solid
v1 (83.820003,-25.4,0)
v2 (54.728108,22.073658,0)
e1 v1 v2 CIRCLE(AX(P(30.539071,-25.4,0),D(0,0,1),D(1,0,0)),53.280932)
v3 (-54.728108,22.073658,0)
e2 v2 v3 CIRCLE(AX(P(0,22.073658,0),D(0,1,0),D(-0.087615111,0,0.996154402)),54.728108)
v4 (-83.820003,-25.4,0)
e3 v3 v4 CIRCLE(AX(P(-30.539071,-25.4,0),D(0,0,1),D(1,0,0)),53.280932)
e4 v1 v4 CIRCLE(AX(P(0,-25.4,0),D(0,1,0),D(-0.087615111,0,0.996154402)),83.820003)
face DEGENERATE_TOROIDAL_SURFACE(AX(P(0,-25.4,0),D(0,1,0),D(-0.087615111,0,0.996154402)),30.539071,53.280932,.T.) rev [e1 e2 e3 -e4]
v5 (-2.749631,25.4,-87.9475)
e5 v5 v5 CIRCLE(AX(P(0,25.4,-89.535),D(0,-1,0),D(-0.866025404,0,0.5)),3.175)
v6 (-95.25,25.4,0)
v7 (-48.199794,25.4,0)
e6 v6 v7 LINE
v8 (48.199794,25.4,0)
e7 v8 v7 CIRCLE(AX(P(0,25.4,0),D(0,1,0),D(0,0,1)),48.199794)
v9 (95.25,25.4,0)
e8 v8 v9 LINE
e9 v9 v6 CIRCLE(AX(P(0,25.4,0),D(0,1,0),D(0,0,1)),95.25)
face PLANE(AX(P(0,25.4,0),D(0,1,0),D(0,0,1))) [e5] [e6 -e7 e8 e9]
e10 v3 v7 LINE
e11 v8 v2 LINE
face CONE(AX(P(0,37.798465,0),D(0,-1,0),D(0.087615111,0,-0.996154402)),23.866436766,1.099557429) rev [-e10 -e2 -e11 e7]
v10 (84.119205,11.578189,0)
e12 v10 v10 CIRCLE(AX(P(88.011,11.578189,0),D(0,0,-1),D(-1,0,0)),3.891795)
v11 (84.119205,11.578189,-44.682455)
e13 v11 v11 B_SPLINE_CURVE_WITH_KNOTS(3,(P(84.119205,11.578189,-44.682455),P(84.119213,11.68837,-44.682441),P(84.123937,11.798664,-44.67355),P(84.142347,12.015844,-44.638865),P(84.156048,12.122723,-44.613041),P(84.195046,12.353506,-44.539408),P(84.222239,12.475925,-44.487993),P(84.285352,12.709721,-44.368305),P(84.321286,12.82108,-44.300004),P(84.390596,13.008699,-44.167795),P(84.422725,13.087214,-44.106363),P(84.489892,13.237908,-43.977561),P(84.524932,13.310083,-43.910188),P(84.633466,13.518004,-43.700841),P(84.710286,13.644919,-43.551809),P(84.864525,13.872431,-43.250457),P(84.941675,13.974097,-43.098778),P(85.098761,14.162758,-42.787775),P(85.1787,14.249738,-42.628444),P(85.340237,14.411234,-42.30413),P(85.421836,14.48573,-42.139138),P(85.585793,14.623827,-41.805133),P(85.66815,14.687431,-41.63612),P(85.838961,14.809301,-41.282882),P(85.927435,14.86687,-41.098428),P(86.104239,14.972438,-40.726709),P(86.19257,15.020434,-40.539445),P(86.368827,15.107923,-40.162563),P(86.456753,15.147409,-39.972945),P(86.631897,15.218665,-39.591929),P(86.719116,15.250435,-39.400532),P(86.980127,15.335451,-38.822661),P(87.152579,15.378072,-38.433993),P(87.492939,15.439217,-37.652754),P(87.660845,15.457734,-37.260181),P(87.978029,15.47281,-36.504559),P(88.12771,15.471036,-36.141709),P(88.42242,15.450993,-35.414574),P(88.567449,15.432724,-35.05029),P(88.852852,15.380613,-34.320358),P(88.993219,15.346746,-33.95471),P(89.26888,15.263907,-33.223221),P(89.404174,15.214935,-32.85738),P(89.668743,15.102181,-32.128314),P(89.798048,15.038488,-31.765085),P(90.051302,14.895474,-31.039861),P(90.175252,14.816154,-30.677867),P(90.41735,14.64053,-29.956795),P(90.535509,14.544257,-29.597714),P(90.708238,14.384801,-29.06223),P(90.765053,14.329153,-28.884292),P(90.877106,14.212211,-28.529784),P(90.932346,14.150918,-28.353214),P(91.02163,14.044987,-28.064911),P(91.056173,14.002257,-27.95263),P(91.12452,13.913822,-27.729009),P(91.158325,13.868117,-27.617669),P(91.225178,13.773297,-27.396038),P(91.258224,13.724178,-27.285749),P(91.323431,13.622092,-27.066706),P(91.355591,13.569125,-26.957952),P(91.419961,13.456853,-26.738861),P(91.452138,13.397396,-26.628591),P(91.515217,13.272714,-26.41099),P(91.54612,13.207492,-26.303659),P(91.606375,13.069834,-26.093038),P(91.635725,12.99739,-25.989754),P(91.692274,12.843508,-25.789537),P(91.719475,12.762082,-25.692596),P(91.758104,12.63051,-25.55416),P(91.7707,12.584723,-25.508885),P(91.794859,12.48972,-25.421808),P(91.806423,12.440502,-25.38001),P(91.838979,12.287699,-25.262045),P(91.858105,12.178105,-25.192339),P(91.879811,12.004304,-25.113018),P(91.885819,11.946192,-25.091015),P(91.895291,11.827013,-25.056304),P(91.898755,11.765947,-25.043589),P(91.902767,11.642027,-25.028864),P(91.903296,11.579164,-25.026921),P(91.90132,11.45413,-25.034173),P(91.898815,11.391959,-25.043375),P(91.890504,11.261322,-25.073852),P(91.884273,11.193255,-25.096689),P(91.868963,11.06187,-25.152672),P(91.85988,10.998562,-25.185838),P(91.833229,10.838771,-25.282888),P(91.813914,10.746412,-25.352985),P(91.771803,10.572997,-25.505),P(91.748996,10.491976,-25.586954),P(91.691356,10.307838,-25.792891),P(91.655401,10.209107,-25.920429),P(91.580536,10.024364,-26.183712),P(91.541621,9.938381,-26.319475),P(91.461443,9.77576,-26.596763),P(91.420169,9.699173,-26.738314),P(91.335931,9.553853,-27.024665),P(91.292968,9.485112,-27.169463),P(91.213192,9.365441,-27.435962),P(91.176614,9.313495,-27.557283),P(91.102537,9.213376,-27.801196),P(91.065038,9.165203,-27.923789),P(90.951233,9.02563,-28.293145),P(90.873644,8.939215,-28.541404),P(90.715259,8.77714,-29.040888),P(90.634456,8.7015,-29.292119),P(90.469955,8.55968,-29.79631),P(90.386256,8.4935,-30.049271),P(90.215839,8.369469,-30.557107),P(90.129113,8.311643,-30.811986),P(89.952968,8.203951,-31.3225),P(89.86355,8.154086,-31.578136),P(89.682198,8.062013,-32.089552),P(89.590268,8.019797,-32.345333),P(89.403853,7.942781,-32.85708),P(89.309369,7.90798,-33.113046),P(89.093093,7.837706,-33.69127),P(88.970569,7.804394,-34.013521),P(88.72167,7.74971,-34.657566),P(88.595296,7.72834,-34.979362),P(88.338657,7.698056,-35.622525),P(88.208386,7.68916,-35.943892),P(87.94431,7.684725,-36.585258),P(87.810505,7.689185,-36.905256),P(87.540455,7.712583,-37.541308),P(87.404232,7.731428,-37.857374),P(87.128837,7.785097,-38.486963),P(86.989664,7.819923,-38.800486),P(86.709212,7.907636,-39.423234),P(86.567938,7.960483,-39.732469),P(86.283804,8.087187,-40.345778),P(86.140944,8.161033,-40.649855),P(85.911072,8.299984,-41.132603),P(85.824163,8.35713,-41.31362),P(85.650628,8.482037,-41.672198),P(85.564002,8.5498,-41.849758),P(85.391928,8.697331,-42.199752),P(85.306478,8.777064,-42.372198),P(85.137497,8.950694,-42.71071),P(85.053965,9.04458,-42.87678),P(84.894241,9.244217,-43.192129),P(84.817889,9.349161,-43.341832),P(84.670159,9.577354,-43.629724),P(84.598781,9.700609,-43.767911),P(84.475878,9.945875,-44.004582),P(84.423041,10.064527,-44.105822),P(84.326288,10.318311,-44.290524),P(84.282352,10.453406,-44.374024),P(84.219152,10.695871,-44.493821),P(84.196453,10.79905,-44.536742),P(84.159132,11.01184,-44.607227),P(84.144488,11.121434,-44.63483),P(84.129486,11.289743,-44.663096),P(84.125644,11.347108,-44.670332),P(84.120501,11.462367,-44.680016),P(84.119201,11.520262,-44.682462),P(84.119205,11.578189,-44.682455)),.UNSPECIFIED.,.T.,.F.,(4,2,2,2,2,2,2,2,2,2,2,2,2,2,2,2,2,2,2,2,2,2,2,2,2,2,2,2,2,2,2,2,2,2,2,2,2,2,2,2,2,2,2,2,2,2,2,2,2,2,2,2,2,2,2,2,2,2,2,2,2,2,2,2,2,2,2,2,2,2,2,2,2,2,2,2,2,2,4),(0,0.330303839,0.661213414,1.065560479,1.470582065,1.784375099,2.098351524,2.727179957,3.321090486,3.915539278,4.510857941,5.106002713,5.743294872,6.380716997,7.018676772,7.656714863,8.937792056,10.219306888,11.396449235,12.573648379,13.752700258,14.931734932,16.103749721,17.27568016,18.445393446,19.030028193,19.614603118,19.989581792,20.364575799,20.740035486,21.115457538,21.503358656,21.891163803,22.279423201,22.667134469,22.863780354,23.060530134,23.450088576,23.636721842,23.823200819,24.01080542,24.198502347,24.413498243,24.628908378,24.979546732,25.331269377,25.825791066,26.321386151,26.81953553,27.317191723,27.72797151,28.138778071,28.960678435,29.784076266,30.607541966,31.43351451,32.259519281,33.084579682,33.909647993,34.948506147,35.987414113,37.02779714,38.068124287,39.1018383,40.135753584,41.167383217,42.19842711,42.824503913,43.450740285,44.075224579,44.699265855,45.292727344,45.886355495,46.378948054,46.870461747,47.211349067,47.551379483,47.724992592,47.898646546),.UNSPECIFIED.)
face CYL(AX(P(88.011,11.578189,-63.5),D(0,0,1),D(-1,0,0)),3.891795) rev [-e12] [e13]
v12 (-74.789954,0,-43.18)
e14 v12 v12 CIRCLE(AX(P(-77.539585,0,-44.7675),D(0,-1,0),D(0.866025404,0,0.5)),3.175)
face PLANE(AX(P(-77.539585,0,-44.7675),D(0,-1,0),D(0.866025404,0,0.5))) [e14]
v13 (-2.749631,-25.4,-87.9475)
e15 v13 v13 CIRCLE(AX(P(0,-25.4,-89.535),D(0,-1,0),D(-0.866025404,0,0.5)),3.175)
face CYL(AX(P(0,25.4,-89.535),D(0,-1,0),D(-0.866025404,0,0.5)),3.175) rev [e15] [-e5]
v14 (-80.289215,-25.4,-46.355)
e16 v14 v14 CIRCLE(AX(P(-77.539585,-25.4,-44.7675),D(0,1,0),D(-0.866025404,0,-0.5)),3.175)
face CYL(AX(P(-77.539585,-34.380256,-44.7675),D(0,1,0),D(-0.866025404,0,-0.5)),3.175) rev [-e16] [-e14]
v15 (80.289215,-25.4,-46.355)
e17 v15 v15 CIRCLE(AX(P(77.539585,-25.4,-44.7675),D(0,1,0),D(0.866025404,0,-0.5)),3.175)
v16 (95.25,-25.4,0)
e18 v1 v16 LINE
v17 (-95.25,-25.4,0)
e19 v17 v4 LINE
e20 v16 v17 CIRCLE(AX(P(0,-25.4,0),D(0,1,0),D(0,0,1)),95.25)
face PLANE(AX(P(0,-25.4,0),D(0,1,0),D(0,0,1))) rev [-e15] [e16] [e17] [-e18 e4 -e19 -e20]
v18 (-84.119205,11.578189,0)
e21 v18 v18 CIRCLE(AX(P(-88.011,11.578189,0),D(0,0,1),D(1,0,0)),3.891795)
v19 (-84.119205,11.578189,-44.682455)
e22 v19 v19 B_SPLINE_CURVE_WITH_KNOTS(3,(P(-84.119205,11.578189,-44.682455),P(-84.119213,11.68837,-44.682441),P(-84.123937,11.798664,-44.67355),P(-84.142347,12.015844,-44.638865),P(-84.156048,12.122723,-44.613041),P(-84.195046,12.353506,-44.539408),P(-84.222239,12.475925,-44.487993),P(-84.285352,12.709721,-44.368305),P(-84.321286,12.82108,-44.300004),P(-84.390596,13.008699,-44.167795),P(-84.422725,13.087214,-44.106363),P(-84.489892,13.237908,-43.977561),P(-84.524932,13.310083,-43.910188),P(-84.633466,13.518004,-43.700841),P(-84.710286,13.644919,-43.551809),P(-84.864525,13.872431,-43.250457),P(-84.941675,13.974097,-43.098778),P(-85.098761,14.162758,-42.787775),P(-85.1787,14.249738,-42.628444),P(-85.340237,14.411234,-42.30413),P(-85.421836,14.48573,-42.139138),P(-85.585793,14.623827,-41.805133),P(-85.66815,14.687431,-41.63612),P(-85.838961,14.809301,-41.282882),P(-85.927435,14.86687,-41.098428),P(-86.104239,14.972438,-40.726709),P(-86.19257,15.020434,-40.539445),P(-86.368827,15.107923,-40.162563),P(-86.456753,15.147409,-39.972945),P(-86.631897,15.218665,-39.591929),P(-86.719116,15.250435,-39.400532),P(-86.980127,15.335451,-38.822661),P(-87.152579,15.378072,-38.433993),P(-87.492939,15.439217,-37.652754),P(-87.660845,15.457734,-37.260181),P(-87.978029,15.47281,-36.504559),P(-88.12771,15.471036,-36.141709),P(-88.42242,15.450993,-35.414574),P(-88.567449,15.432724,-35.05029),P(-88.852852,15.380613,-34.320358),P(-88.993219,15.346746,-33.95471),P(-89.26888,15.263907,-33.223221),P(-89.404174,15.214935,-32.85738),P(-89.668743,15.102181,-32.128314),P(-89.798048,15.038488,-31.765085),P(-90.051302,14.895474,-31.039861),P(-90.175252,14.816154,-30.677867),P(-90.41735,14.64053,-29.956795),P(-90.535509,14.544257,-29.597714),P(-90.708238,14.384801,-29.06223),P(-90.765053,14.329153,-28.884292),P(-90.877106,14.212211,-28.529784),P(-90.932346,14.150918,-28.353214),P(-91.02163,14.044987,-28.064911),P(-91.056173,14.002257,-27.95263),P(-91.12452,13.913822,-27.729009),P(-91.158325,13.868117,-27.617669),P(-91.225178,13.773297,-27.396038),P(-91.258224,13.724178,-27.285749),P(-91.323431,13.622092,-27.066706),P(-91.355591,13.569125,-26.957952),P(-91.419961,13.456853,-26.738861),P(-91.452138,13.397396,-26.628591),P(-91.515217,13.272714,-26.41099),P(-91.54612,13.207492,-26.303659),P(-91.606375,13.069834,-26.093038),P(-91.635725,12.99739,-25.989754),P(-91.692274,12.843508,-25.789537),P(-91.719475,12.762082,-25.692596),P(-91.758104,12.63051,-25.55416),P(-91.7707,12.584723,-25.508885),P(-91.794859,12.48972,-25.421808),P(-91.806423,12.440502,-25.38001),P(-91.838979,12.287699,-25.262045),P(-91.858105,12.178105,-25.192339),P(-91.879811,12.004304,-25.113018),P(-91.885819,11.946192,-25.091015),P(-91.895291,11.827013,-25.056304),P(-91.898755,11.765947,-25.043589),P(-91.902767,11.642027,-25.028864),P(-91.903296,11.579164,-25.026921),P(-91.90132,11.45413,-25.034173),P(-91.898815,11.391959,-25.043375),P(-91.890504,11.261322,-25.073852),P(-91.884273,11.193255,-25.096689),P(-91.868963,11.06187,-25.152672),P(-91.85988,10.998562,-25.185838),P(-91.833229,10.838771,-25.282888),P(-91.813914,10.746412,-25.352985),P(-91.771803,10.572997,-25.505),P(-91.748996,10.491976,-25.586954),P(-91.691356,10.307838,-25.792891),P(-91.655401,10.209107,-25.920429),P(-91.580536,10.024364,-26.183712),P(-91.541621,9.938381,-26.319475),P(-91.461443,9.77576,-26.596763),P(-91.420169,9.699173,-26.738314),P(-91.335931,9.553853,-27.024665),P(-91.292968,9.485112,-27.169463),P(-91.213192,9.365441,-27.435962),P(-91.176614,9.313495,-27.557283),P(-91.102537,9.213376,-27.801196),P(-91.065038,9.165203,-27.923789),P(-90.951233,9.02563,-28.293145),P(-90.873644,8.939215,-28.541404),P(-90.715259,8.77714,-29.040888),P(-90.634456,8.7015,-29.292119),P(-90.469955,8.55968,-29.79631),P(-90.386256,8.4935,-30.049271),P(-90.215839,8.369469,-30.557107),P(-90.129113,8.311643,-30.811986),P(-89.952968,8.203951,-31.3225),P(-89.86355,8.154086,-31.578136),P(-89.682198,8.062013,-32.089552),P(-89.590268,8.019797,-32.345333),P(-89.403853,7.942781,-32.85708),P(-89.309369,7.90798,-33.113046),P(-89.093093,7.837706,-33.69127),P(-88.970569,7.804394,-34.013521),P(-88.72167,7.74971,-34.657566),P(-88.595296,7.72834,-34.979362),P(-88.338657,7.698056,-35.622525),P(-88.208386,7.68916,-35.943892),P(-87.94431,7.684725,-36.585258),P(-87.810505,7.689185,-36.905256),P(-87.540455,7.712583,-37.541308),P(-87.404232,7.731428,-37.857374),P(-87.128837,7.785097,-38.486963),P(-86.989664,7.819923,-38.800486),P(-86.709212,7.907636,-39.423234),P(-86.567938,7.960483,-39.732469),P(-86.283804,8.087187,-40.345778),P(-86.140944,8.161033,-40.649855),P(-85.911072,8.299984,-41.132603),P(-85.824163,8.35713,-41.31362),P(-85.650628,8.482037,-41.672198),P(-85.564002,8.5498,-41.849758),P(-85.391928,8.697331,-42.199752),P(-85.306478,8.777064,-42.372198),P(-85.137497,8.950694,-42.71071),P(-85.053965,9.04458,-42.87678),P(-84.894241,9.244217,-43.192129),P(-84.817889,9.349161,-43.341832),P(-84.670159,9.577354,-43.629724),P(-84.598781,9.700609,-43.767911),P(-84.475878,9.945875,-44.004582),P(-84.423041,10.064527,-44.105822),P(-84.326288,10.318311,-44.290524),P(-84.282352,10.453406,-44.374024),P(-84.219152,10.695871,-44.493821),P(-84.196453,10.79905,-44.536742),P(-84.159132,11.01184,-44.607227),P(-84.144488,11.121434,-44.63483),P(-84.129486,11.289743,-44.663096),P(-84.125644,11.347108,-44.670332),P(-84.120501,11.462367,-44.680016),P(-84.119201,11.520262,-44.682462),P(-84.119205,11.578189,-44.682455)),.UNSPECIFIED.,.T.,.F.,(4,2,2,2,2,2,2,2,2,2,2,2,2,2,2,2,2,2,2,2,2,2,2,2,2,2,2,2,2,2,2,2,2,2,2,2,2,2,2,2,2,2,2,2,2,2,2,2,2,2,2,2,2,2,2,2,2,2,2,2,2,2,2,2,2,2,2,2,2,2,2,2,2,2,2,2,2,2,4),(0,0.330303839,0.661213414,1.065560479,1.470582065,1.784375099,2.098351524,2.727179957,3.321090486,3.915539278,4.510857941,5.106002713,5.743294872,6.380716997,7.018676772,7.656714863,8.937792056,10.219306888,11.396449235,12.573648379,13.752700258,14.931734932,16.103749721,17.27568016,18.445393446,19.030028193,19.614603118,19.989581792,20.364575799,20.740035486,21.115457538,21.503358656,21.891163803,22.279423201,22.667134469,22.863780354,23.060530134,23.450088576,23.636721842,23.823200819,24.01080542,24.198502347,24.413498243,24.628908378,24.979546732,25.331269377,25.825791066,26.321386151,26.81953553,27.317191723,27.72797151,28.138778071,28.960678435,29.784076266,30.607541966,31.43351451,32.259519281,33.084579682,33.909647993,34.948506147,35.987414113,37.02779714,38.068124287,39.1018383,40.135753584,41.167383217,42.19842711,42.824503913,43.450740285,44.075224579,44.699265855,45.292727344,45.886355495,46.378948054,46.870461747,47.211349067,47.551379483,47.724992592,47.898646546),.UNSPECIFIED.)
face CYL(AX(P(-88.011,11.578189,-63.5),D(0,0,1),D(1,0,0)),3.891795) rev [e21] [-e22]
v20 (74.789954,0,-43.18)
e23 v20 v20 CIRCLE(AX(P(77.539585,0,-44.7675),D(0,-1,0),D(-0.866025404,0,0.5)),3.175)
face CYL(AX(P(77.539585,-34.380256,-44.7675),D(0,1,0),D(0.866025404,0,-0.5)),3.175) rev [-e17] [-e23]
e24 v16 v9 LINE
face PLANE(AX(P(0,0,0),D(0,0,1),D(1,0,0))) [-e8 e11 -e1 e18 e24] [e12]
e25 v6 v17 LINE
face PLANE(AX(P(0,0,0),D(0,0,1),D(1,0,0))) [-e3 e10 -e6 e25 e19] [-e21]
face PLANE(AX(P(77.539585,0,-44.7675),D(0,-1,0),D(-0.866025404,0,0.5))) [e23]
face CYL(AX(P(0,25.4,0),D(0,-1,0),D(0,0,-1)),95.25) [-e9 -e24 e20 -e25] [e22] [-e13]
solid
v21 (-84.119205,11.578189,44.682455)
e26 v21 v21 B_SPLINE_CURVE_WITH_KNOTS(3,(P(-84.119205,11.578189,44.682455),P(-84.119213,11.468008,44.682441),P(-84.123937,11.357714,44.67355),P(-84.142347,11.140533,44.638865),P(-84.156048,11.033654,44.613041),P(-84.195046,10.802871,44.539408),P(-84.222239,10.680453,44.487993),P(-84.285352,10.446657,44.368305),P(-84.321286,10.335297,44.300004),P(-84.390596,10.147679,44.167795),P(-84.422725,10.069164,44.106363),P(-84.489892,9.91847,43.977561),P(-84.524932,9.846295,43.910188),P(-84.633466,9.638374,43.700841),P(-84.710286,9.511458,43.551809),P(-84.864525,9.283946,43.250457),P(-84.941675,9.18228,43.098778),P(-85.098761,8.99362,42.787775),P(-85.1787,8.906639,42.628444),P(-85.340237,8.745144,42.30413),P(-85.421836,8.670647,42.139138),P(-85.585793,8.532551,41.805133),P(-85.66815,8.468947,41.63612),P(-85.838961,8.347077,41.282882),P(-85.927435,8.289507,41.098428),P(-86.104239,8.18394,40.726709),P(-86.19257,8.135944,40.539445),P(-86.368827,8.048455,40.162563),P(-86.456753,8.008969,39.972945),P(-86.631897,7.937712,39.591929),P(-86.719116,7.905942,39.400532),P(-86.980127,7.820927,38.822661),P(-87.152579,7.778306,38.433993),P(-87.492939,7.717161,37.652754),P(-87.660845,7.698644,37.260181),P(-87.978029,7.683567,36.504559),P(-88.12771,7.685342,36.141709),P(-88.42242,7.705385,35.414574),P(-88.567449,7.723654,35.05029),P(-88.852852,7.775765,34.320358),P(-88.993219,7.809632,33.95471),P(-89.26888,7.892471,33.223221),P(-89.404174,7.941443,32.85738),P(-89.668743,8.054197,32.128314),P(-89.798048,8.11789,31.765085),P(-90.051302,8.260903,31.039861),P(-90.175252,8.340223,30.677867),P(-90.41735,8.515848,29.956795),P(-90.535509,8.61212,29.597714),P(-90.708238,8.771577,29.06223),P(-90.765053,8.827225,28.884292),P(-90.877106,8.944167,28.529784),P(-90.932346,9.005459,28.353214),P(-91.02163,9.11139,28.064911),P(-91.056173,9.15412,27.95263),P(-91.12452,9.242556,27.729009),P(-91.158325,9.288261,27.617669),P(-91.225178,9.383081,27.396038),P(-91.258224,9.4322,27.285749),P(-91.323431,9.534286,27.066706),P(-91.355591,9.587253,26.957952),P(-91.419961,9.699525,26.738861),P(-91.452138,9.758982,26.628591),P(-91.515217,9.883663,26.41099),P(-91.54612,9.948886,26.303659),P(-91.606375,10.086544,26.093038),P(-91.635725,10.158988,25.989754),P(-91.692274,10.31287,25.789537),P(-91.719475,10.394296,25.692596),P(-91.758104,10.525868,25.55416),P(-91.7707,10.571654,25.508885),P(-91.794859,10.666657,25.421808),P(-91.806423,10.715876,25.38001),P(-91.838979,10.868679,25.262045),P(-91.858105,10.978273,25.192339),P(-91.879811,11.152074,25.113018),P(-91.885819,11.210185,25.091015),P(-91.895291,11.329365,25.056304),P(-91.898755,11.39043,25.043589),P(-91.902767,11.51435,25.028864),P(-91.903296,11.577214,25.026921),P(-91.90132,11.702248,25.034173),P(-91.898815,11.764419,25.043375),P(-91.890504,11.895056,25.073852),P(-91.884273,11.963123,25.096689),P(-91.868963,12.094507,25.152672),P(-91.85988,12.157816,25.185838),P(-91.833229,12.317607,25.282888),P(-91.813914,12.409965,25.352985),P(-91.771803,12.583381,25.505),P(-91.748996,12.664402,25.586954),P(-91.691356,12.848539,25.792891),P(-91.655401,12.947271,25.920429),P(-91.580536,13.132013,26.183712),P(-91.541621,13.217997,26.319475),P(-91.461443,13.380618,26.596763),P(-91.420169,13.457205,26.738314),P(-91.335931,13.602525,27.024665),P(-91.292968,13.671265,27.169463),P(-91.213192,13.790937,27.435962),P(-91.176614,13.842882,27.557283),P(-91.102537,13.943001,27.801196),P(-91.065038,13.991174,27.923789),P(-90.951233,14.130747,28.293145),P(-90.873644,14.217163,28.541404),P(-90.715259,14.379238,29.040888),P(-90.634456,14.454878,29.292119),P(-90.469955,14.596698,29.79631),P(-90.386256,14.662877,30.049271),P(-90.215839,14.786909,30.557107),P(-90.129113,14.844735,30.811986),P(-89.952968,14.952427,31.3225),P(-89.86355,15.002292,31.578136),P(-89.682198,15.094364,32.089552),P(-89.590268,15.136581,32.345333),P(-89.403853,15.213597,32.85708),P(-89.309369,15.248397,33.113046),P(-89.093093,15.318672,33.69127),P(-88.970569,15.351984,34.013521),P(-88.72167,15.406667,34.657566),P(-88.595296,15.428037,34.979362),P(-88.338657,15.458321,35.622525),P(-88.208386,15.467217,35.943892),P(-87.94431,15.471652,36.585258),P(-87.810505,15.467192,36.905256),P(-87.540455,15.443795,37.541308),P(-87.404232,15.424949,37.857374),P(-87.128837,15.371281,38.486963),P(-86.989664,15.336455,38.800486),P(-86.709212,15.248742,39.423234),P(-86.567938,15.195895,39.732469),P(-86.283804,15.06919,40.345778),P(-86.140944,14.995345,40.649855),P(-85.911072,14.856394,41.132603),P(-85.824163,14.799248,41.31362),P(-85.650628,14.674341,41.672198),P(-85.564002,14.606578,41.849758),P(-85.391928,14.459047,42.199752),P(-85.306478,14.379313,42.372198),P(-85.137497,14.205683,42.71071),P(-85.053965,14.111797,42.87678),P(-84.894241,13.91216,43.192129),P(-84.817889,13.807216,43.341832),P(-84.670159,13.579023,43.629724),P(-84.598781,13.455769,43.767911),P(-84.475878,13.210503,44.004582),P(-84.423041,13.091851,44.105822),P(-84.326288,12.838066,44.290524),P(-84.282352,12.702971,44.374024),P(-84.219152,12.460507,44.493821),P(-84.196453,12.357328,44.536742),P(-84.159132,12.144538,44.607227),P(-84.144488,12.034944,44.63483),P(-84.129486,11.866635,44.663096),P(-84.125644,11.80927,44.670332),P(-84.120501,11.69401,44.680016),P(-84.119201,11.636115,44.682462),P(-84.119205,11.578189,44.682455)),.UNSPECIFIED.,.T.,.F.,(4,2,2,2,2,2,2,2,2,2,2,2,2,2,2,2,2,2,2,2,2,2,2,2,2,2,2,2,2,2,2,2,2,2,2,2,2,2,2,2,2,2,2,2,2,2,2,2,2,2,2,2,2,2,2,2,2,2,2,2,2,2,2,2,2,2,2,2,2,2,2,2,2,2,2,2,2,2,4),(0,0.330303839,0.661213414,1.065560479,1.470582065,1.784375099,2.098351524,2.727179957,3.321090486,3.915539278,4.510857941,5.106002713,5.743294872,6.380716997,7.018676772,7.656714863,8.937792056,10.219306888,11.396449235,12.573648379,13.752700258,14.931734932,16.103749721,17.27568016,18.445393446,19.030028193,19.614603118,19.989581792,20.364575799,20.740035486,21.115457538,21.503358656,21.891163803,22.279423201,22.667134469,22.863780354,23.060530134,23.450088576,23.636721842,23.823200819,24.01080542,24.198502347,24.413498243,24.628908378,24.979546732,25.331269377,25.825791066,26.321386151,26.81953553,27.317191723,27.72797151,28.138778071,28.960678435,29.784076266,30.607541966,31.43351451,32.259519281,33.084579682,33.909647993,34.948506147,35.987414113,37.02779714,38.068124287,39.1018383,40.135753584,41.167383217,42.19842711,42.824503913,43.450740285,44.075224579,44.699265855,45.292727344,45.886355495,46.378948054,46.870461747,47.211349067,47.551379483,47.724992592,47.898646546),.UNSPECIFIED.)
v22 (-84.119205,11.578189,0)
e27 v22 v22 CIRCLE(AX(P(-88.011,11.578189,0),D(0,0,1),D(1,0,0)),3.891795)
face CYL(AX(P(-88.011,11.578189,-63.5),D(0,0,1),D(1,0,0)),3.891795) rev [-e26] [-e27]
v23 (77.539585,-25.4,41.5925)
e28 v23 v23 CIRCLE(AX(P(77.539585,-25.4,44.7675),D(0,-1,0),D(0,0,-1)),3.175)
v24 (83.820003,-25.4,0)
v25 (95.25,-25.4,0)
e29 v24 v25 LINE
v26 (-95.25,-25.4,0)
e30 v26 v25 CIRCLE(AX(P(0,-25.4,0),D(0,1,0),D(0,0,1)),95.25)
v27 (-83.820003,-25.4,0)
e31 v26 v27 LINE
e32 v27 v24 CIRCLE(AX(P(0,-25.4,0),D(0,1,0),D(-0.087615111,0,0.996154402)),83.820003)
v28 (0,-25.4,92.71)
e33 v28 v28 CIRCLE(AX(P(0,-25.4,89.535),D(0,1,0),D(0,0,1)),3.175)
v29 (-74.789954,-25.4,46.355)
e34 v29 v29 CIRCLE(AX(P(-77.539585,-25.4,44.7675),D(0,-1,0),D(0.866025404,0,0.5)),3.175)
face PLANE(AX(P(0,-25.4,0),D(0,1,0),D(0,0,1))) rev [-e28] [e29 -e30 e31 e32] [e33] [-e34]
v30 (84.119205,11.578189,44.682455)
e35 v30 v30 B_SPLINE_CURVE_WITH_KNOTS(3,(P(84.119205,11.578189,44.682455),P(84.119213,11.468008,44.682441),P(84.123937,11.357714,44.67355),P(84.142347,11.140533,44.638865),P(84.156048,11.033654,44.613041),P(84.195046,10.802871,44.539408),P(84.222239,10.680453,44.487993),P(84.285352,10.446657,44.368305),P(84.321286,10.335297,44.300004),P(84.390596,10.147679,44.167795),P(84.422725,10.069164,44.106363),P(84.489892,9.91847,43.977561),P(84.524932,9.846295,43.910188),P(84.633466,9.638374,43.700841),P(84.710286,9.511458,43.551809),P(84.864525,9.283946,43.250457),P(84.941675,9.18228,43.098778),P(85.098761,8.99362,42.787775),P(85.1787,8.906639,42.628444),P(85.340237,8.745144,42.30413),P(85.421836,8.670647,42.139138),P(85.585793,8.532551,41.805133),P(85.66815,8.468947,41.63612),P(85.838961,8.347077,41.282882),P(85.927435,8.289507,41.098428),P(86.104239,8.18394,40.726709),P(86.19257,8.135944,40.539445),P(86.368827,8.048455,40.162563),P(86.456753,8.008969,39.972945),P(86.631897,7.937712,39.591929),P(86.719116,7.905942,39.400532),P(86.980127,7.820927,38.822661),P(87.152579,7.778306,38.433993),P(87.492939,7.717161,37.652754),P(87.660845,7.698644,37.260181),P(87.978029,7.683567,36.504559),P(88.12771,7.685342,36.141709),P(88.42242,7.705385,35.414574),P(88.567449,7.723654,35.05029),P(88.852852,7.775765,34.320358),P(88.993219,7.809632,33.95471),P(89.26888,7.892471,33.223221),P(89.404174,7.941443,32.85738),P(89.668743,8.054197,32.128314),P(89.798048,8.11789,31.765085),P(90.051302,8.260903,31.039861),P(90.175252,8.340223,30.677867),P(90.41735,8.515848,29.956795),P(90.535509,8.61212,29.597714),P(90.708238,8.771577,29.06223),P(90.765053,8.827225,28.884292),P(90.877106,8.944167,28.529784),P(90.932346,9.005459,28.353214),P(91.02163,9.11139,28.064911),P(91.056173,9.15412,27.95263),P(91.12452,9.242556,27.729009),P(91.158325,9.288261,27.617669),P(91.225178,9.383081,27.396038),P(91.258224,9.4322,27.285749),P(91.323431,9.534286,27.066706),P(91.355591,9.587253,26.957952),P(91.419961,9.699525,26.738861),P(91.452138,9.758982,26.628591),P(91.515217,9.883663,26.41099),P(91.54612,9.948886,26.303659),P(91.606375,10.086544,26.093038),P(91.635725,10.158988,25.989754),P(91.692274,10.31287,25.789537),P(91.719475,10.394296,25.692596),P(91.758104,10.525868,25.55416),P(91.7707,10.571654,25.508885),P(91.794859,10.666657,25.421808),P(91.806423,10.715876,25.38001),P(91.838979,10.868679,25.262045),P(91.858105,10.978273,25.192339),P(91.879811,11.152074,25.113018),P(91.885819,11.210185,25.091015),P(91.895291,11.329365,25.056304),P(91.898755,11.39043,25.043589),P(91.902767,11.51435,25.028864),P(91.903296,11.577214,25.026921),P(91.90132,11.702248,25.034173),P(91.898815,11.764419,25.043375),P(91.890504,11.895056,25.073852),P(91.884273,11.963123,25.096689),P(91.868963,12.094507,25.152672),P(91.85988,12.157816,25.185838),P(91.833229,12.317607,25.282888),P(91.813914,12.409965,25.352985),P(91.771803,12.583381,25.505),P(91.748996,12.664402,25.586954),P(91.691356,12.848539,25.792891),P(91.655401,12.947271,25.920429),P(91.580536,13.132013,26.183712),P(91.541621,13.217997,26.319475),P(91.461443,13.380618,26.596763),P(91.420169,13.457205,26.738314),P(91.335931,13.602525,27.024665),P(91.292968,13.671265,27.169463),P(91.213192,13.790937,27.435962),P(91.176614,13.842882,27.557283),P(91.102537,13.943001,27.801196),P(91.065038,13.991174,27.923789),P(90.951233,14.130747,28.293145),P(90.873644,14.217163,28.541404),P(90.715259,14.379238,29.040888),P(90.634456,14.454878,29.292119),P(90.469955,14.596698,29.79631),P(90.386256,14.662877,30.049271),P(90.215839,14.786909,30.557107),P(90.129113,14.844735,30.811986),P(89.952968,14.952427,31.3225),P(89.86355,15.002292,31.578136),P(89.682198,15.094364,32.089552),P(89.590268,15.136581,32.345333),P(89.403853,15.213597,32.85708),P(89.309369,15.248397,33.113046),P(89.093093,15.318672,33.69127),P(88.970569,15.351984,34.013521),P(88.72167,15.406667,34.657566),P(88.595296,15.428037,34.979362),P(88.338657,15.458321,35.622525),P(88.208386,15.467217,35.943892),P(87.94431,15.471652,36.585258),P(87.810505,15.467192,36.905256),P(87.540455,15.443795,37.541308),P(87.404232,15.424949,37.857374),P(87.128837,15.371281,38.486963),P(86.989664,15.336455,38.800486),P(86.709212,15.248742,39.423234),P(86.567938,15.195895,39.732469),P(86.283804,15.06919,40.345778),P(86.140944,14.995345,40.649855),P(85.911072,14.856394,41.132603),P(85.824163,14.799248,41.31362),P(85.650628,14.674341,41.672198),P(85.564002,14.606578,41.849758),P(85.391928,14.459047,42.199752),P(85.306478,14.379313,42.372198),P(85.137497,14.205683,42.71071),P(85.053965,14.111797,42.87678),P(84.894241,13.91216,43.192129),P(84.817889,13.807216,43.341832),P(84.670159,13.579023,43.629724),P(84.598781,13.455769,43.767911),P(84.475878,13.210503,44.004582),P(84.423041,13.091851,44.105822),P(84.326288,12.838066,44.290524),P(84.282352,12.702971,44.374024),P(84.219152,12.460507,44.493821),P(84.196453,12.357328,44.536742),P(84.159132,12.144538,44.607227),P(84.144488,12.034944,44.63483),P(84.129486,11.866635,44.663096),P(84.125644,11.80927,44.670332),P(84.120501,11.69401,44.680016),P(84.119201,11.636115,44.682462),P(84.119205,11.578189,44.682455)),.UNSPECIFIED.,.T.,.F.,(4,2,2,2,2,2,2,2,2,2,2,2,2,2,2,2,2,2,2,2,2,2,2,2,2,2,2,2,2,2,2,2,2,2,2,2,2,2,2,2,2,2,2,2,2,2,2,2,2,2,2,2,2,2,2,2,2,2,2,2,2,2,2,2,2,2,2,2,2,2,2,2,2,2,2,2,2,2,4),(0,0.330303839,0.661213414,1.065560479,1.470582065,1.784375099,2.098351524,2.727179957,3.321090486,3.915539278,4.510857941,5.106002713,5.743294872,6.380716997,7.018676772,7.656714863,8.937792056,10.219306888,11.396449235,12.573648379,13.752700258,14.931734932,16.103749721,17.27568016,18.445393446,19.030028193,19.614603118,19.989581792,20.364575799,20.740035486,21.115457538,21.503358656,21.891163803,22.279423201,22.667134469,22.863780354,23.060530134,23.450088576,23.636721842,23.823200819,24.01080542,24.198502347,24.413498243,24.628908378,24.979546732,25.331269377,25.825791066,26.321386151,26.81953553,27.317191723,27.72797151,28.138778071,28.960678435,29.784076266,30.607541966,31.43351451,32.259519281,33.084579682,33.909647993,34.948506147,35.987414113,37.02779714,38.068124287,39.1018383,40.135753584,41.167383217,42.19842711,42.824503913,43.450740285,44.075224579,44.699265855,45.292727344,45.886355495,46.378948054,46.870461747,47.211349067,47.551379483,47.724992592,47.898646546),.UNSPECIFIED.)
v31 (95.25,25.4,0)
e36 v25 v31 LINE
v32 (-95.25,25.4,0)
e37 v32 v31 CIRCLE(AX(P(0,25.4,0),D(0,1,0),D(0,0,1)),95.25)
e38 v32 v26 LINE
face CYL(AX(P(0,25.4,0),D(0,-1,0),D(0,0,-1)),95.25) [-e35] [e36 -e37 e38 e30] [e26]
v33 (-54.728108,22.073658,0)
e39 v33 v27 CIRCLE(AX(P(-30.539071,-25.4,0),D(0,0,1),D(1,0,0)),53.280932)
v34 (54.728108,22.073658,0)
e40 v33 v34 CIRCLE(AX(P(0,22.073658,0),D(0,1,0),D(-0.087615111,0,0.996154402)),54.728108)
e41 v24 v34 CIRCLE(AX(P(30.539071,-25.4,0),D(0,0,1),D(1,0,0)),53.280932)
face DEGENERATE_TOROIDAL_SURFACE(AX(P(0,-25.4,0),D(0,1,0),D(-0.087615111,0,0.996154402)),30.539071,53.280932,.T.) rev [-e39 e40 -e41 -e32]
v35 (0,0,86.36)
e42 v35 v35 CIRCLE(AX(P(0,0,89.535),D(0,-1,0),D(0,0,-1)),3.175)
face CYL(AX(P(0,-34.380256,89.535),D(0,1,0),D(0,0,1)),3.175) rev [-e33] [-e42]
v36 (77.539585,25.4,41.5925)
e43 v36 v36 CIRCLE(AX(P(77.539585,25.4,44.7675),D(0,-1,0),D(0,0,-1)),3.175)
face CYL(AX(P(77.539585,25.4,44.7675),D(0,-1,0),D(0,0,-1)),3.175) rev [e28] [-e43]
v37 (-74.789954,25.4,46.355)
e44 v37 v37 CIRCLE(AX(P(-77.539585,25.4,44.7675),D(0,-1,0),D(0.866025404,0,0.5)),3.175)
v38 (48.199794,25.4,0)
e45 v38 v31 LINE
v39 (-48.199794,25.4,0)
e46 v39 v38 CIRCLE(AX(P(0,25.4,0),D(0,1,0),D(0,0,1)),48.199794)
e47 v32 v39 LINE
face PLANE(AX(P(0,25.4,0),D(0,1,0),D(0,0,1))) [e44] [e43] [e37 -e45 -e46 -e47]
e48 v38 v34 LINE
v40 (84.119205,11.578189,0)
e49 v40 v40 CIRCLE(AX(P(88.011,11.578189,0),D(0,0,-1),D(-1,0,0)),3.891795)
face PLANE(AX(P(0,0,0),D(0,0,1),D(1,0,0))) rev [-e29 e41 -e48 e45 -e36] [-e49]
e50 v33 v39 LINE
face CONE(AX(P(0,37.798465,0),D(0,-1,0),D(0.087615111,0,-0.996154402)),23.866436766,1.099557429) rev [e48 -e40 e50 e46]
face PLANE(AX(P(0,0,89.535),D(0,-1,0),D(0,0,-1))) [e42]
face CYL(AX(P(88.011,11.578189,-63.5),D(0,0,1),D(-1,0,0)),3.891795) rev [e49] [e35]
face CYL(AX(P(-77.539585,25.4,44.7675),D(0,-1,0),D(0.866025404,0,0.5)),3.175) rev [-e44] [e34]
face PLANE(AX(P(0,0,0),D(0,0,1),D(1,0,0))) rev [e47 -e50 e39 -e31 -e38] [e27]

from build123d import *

# Parameters (mm, degrees)
SKETCH1_R           = 95.25
BOSS_EXTRUDE1_DEPTH = 25.4
CUT_EXTRUDE3_START  = -25.4
SKETCH6_R           = 3.175
CUT_EXTRUDE3_DEPTH  = 25.4
CIRPATTERN1_COUNT   = 3
SKETCH7_R           = 3.175
CUT_EXTRUDE4_DEPTH  = 144.964457521
CIRPATTERN2_COUNT   = 3
SKETCH8_R           = 3.891794663
CUT_EXTRUDE5_DEPTH  = 63.5


# Read off the part's stored shape, not the designer's step: Cavity1
with BuildPart() as part:
    # Sketch1 → Boss-Extrude1 (new, symmetric)
    with BuildSketch(Plane(origin=(0, 0, 0), x_dir=(1, 0, 0), z_dir=(0, 1, 0))):
        with Locations(Location((0, 0, 0), (0, 0, 270))):
            Circle(SKETCH1_R)
    extrude(amount=BOSS_EXTRUDE1_DEPTH, both=True)

    # Cavity1 outline → Cavity1 (revolve, cut)
    with BuildSketch(Plane.XY):
        with BuildLine():
            Line((0, -25.4), (83.820002599, -25.4))
            ThreePointArc((83.820002599, -25.4), (75.968533234, 2.439210437), (54.728107607, 22.073657924))
            Line((54.728107607, 22.073657924), (48.199793705, 25.4))
            Line((48.199793705, 25.4), (0, 25.4))
            Line((0, 25.4), (0, -25.4))
        make_face()
    revolve(axis=Axis((0, 0, 0), (0, 1, 0)), mode=Mode.SUBTRACT)


with BuildPart() as body_2:
    # Split1: the piece on the far side of the plane
    add(part.part)
    split(bisect_by=Plane.XY, keep=Keep.BOTTOM)


with BuildPart() as part_1:
    add(part.part)

    # Split1
    split(bisect_by=Plane.XY, keep=Keep.TOP)

    # Sketch6 → Cut-Extrude3 (cut)
    with BuildSketch(Plane(origin=(0, -25.4, 0), x_dir=(-1, 0, 0), z_dir=(0, -1, 0)).offset(CUT_EXTRUDE3_START)):
        with Locations(Location((0, -89.535, 0), (0, 0, 270))):
            Circle(SKETCH6_R)
    cut_extrude3 = extrude(amount=CUT_EXTRUDE3_DEPTH, mode=Mode.SUBTRACT)

    # Sketch7 → Cut-Extrude4 (cut, through all)
    with BuildSketch(Plane(origin=(0, -25.4, 0), x_dir=(-1, 0, 0), z_dir=(0, -1, 0))):
        with Locations(Location((-77.539584528, -44.7675, 0), (0, 0, 90))):
            Circle(SKETCH7_R)
    cut_extrude4 = extrude(amount=-CUT_EXTRUDE4_DEPTH, mode=Mode.SUBTRACT)


with BuildPart() as body_2_1:
    add(body_2.part)

    # CirPattern1: Cut-Extrude3 ×3 about axis
    cirpattern1_axis = Axis((0, 0, 0), (0, 1, 0))
    for i in range(1, CIRPATTERN1_COUNT):
        add(cut_extrude3.rotate(cirpattern1_axis, i * 360 / CIRPATTERN1_COUNT), mode=Mode.SUBTRACT)


with BuildPart() as cirpattern2_tool:
    # CirPattern2: Cut-Extrude4 ×3 about axis
    cirpattern2_axis = Axis((0, 0, 0), (0, 1, 0))
    for i in range(1, CIRPATTERN2_COUNT):
        add(cut_extrude4.rotate(cirpattern2_axis, i * 360 / CIRPATTERN2_COUNT))


with BuildPart() as part_2:
    add(part_1.part)

    # CirPattern2: cut by cirpattern2_tool
    add(cirpattern2_tool.part, mode=Mode.SUBTRACT)


with BuildPart() as body_2_2:
    add(body_2_1.part)

    # CirPattern2: cut by cirpattern2_tool
    add(cirpattern2_tool.part, mode=Mode.SUBTRACT)


with BuildPart() as cut_extrude5_tool:
    # Sketch8 → Cut-Extrude5 (new, symmetric)
    with BuildSketch(Plane.XY):
        with Locations((-88.011, 11.578188828)):
            Circle(SKETCH8_R)
    cut_extrude5 = extrude(amount=CUT_EXTRUDE5_DEPTH, both=True)


with BuildPart() as part_3:
    add(part_2.part)

    # Cut-Extrude5: cut by cut_extrude5_tool
    add(cut_extrude5_tool.part, mode=Mode.SUBTRACT)


with BuildPart() as body_2_3:
    add(body_2_2.part)

    # Cut-Extrude5: cut by cut_extrude5_tool
    add(cut_extrude5_tool.part, mode=Mode.SUBTRACT)


with BuildPart() as mirror1_tool:
    # Mirror1: Cut-Extrude5 across plane
    add(cut_extrude5.mirror(Plane(origin=(0, 0, 0), x_dir=(0, 0, 1), z_dir=(1, 0, 0))))


with BuildPart() as part_4:
    add(part_3.part)

    # Mirror1: cut by mirror1_tool
    add(mirror1_tool.part, mode=Mode.SUBTRACT)


with BuildPart() as body_2_4:
    add(body_2_3.part)

    # Mirror1: cut by mirror1_tool
    add(mirror1_tool.part, mode=Mode.SUBTRACT)


solid = Compound([part_4.part, body_2_4.part])
